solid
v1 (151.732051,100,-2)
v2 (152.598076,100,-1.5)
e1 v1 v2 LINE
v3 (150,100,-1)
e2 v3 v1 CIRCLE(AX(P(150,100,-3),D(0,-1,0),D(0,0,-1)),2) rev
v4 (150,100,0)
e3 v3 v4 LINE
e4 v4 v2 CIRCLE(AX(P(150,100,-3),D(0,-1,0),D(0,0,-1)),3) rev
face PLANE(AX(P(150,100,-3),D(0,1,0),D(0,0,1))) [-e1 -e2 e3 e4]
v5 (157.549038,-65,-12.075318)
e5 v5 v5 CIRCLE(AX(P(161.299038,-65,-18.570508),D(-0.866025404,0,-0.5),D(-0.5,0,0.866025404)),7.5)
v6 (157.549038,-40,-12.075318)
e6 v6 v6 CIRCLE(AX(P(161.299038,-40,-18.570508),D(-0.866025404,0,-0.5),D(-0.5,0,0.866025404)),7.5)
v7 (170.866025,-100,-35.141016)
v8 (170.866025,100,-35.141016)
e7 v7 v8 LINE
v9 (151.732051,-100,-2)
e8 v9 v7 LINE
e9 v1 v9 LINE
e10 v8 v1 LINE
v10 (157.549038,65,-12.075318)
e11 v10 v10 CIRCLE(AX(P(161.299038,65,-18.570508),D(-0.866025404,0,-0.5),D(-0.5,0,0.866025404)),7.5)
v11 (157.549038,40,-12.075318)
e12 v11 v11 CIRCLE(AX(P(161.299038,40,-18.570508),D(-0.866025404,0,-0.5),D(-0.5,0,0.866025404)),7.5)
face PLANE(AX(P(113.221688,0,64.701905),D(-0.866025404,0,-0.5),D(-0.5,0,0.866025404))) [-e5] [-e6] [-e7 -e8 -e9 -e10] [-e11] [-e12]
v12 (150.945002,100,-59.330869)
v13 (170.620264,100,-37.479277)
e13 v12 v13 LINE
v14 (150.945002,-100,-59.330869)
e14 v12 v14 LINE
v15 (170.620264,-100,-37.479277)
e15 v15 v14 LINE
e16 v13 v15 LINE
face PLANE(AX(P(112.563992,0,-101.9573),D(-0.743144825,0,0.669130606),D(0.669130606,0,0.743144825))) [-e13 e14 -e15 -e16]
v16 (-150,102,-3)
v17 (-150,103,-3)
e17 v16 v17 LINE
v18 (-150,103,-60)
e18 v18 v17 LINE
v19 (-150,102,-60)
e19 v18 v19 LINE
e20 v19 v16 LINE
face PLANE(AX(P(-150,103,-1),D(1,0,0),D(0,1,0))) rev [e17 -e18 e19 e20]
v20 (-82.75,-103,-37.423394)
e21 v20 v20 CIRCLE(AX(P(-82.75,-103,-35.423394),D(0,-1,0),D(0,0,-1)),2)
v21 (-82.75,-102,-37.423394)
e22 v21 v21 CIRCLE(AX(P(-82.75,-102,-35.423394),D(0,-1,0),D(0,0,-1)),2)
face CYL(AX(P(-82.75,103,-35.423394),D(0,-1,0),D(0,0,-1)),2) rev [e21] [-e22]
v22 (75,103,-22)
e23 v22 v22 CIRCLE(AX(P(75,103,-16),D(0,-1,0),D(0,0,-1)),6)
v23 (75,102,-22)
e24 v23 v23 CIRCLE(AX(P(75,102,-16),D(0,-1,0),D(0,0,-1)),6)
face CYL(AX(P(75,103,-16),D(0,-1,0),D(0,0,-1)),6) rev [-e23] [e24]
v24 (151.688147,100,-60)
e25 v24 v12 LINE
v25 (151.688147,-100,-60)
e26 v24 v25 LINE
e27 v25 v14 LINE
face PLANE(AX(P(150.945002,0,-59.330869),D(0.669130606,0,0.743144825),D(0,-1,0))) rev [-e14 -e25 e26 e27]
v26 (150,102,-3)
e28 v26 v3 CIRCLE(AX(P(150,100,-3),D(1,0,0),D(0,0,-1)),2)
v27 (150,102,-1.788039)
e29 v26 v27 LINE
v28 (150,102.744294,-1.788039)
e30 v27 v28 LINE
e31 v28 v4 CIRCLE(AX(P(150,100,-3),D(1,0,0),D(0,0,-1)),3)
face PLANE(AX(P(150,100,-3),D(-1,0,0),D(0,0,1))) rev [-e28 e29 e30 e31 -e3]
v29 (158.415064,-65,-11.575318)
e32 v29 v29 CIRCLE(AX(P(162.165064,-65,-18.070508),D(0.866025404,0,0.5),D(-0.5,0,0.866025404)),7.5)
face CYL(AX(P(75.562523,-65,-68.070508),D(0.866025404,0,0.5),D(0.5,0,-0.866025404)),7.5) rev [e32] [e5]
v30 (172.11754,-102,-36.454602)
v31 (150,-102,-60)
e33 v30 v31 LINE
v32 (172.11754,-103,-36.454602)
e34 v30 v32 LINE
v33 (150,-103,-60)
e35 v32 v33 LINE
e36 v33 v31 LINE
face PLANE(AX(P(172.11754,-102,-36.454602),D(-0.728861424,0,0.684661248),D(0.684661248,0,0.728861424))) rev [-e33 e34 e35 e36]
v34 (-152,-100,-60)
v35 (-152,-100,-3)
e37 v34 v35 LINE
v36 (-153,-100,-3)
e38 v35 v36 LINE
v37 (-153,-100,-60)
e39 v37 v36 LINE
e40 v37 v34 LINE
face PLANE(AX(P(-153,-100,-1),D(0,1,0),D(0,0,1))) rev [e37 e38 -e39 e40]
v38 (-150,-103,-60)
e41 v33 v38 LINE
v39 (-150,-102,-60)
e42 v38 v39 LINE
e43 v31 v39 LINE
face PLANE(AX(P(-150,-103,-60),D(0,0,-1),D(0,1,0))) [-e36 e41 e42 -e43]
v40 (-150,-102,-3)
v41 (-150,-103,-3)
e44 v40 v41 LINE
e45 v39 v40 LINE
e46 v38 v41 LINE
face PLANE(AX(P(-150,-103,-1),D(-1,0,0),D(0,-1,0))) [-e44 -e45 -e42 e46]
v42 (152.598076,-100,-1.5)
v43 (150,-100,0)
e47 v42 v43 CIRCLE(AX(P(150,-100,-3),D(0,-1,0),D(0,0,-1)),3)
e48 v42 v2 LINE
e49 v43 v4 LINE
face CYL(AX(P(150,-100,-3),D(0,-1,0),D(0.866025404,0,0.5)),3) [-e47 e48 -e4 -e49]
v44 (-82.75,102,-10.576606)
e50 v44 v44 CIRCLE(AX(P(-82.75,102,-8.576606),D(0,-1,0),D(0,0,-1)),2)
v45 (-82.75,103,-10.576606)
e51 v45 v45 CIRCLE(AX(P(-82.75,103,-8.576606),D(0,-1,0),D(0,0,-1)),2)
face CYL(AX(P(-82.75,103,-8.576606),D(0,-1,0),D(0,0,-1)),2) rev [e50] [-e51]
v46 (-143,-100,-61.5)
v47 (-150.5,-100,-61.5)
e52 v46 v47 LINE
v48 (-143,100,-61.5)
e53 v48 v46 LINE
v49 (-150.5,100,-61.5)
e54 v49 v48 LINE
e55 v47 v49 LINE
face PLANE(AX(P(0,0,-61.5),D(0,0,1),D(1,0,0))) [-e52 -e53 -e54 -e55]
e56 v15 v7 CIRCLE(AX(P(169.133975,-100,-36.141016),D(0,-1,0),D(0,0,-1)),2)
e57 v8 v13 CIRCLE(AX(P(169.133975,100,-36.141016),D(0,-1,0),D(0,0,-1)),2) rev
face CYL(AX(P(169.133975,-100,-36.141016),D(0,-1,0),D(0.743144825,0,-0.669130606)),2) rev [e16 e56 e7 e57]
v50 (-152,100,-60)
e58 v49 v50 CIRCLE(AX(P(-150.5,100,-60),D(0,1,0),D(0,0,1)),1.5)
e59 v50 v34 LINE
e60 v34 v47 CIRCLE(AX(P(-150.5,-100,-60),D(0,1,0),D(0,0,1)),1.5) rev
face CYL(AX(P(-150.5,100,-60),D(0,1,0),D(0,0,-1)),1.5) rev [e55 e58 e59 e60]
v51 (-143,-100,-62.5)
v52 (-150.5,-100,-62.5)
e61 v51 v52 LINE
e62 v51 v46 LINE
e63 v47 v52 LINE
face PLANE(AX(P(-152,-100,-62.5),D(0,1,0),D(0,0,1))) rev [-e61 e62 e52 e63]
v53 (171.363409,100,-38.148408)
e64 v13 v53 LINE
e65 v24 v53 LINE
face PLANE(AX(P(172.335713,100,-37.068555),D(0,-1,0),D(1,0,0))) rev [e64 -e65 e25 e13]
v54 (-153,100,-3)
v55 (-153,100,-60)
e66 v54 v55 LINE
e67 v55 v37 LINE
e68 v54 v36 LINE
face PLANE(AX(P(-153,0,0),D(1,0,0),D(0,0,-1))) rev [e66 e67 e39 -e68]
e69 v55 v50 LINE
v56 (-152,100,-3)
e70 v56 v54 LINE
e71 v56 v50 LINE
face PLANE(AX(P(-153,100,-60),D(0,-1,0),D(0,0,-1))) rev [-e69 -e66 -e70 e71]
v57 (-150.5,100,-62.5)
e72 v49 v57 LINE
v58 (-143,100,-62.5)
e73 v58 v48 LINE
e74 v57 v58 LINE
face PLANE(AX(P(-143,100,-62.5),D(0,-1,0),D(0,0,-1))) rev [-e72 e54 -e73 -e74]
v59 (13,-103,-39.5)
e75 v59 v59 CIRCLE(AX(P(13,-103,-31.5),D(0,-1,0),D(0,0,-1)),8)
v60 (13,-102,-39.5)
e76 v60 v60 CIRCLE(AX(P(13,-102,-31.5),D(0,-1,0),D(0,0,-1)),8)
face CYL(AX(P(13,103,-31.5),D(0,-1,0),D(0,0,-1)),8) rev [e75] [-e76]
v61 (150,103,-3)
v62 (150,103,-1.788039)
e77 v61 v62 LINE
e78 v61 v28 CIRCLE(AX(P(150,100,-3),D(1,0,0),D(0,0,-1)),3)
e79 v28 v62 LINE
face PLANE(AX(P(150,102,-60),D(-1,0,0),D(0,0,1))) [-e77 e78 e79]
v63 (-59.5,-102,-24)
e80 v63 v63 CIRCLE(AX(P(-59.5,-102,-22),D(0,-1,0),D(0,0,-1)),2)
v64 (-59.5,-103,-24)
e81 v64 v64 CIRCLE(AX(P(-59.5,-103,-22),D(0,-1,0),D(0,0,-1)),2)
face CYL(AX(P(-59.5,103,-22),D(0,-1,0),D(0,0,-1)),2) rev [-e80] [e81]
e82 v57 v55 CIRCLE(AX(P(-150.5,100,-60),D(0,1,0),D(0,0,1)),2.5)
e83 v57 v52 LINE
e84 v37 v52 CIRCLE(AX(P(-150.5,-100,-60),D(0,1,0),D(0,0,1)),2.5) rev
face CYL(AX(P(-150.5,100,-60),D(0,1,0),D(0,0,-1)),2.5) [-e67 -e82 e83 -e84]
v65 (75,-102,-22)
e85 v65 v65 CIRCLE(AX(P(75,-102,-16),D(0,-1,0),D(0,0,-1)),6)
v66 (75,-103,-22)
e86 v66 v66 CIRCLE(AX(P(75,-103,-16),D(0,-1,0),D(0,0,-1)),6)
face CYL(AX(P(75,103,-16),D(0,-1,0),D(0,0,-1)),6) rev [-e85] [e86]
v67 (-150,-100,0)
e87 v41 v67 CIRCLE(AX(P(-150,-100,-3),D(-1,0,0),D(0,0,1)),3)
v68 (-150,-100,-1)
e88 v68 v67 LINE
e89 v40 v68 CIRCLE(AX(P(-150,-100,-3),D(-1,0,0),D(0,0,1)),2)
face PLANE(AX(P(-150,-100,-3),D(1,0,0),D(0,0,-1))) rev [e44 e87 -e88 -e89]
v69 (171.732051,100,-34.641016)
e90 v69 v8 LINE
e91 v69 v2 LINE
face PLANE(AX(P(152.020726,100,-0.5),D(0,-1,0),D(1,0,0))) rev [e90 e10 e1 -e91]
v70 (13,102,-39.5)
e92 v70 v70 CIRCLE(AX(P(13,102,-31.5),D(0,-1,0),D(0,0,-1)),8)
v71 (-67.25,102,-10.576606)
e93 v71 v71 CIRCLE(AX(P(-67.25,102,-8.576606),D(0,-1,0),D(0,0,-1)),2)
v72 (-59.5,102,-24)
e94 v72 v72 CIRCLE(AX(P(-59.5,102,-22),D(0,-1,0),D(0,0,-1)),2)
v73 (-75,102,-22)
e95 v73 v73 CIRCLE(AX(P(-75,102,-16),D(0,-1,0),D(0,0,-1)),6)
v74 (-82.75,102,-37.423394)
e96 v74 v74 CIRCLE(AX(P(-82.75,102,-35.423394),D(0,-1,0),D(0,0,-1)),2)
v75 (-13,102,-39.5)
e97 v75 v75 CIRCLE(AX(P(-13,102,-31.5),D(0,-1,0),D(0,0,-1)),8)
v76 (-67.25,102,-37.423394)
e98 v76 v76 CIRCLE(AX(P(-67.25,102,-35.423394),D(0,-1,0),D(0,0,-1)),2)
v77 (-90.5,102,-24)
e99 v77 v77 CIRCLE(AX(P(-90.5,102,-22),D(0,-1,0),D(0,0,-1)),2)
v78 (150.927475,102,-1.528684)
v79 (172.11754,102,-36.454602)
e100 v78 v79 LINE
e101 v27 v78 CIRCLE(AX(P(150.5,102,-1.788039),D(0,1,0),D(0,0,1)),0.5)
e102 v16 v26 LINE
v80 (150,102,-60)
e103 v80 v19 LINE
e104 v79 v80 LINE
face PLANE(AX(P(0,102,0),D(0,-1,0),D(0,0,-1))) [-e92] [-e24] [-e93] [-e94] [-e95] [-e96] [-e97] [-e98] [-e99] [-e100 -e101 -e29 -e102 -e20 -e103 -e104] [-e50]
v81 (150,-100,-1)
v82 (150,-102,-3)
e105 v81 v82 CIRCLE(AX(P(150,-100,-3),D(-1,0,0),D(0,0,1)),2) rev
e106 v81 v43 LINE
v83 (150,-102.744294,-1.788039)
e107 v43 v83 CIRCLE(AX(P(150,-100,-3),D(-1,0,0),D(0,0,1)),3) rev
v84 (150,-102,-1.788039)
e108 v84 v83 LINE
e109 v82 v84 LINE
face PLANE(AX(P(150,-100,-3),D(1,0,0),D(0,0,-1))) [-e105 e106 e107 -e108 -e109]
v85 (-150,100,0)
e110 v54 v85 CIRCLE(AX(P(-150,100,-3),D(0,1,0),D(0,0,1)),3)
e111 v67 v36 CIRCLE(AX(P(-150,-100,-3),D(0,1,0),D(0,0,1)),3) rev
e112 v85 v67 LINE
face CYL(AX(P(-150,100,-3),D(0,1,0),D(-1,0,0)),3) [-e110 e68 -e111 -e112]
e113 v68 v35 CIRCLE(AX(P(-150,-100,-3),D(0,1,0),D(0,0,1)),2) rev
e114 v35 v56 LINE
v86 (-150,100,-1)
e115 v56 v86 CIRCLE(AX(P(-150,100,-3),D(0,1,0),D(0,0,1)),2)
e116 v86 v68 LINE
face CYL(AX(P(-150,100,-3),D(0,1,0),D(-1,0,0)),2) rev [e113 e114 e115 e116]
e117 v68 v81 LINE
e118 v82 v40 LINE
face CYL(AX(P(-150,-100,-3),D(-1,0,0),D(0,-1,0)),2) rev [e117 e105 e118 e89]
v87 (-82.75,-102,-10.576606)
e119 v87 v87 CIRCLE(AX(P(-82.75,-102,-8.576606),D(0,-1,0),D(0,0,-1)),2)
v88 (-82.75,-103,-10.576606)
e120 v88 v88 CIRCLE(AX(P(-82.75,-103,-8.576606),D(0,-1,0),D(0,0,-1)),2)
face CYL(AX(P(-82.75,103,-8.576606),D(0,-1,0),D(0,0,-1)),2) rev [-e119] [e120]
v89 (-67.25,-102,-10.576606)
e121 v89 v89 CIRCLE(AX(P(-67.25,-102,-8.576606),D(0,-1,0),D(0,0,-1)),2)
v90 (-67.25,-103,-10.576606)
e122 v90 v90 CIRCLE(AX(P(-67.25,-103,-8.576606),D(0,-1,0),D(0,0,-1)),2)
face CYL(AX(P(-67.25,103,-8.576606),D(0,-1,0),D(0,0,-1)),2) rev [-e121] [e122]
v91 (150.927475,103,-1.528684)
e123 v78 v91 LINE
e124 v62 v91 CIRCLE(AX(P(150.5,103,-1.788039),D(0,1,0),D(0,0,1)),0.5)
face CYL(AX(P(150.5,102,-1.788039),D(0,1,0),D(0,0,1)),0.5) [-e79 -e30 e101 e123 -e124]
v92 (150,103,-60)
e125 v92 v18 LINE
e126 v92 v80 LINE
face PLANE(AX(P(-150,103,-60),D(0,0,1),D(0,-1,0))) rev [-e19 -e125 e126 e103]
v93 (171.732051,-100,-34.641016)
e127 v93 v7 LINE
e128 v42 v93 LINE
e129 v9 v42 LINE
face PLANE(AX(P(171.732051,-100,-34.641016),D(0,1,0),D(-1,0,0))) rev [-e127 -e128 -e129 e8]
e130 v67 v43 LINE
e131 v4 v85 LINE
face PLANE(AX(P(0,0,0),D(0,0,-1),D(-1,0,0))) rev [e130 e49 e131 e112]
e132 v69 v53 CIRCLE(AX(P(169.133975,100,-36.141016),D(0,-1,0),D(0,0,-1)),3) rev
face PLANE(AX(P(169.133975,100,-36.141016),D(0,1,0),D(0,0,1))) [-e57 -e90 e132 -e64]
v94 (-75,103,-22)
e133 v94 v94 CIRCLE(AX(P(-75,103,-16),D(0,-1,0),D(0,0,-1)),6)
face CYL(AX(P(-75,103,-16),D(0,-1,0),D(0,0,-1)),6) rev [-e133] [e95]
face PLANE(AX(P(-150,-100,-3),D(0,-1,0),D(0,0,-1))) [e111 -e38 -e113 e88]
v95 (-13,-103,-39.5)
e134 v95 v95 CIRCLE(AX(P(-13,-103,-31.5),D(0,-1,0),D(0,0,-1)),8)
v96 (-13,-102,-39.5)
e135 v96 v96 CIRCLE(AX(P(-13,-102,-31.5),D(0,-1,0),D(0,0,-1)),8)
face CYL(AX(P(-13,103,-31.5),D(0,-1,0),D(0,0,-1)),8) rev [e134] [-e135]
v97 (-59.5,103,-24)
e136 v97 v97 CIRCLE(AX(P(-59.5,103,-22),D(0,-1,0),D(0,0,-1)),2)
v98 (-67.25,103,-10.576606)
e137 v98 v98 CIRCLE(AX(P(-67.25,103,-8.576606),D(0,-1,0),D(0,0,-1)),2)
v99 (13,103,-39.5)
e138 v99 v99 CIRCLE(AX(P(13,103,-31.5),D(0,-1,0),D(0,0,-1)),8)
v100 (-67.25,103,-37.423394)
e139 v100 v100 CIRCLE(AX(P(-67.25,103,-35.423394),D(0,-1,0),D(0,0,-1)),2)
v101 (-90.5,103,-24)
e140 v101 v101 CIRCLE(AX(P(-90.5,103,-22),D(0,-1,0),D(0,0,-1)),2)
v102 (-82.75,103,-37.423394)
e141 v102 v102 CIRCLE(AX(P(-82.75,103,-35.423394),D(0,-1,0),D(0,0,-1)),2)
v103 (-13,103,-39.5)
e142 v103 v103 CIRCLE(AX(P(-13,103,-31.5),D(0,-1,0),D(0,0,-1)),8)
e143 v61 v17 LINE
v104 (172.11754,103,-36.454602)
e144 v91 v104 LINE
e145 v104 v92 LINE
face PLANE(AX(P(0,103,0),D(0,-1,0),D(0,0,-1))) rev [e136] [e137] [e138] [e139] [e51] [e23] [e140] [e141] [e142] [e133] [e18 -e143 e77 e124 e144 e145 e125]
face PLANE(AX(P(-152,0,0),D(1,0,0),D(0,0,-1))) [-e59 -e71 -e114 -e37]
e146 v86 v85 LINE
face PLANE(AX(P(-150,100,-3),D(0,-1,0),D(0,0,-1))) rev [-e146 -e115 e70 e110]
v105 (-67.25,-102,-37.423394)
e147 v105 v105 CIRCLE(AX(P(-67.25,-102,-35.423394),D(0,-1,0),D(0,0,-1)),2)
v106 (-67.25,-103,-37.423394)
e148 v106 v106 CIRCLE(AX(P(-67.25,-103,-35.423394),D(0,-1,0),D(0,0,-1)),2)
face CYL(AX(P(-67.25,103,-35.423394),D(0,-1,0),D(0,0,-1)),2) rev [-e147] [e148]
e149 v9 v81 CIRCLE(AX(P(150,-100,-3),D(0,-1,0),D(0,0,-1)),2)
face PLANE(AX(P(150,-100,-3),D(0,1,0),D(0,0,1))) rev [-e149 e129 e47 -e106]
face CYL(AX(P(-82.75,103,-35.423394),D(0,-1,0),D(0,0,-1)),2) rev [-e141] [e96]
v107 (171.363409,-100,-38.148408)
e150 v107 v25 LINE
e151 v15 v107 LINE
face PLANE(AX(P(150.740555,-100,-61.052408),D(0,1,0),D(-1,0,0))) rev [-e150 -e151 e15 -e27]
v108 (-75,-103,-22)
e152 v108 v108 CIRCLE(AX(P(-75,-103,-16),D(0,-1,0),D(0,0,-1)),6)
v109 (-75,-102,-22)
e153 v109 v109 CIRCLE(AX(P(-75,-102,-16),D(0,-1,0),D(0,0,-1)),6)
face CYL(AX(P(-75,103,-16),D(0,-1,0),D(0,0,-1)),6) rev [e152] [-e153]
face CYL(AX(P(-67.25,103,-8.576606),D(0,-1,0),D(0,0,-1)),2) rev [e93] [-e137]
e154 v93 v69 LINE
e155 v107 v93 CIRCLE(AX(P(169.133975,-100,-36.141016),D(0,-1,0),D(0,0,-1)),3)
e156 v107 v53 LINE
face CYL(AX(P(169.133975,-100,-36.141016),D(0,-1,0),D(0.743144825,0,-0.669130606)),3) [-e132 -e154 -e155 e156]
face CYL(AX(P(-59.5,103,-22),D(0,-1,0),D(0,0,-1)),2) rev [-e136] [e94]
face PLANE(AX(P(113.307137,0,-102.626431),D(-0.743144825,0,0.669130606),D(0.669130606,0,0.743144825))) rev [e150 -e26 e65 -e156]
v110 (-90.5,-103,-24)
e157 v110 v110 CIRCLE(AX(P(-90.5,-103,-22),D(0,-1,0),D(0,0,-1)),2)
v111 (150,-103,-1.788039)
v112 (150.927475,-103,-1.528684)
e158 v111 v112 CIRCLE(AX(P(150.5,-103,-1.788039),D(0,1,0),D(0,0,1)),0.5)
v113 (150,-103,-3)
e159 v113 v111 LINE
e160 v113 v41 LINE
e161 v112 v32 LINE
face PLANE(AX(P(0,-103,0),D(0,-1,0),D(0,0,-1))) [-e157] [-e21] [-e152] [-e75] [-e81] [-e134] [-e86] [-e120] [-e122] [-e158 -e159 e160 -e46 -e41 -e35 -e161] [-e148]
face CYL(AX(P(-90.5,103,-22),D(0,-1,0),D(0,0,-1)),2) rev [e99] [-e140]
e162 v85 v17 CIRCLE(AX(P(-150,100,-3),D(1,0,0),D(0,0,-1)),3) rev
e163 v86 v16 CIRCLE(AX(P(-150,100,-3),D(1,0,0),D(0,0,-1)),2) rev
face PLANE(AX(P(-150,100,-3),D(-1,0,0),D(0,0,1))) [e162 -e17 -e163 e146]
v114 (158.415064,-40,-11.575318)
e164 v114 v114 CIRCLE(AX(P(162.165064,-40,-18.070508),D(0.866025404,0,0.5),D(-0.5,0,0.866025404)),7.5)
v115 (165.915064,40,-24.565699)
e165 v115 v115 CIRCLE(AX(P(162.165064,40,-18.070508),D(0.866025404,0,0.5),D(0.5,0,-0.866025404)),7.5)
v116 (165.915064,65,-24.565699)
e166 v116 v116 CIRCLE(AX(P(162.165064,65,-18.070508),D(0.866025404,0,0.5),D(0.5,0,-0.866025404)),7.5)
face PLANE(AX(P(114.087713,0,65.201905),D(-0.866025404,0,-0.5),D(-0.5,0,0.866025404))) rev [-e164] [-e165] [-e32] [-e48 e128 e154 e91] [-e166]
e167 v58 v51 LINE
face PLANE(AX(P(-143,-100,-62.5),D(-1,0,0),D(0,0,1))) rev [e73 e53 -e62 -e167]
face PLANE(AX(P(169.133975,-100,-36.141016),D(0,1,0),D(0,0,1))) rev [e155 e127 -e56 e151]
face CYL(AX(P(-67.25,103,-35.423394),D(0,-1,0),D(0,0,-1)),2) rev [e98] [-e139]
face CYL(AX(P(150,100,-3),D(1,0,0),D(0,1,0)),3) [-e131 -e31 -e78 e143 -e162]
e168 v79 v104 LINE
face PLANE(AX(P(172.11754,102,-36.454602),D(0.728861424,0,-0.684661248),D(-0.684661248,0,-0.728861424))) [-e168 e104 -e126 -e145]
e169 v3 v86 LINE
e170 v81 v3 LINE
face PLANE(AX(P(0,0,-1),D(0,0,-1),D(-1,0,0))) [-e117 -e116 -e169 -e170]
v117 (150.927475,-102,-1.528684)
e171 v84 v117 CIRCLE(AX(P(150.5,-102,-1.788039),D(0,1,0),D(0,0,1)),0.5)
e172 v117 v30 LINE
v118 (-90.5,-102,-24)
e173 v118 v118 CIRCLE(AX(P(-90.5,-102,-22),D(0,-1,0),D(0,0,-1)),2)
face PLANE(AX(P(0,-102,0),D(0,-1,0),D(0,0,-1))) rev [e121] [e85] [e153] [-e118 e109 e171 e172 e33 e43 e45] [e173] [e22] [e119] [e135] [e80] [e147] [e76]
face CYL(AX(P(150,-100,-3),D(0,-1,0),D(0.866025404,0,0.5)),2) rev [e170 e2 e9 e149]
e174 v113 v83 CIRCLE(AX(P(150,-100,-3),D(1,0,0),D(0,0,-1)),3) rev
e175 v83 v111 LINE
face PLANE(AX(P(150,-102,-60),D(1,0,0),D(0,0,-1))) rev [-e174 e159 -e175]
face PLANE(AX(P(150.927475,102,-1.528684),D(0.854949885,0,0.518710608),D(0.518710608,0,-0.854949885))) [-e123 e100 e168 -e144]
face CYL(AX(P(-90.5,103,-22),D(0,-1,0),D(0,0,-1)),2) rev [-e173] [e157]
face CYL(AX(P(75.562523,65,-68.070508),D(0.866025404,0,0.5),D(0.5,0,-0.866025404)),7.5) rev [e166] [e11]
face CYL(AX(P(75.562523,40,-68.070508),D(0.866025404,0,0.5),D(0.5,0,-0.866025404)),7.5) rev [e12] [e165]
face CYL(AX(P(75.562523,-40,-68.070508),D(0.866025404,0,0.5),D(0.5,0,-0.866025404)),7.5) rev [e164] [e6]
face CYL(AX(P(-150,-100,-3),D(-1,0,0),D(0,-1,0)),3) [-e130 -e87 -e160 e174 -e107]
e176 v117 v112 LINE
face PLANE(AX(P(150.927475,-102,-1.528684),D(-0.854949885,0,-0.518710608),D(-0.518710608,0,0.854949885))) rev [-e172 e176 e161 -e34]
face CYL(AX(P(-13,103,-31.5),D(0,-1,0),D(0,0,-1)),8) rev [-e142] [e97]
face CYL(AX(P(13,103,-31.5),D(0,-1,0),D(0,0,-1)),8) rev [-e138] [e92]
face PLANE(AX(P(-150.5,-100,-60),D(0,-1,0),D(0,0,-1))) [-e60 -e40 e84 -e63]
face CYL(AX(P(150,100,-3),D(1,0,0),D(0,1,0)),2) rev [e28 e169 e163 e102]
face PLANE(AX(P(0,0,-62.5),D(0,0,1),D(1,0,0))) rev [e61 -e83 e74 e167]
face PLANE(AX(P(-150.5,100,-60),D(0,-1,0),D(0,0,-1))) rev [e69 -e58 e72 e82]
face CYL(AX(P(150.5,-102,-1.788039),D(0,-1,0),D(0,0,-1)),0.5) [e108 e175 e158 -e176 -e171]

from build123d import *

# Parameters (mm, degrees)
SKETCH1_W           = 300
SKETCH1_H           = 200
BASE_FLANGE1_DEPTH  = 1
EDGE_FLANGE1_DEPTH  = 200
EDGE_FLANGE2_DEPTH  = 300
EDGE_FLANGE3_DEPTH  = 300
EDGE_FLANGE4_DEPTH  = 200
EDGE_FLANGE5_DEPTH  = 200
BOSS_EXTRUDE2_DEPTH = 1
CUT_EXTRUDE4_START  = -100
CUT_EXTRUDE4_DEPTH  = 200
SKETCH26_R          = 7.5
CUT_EXTRUDE5_DEPTH  = 100
EDGE_FLANGE7_DEPTH  = 200
SKETCH38_R          = 6
CUT_EXTRUDE6_DEPTH  = 276.630831386
SKETCH40_R          = 2
CUT_EXTRUDE7_DEPTH  = 276.630831386
SKETCH41_R          = 8
CUT_EXTRUDE8_DEPTH  = 276.630831386


# Read off the part's stored shape, not the designer's step: Cut-Extrude4
# Sheet-metal steps are written as plain solids
with BuildPart() as part:
    # Sketch1 → Base-Flange1 (new body)
    with BuildSketch(Plane.XY):
        Rectangle(SKETCH1_W, SKETCH1_H)
    extrude(amount=-BASE_FLANGE1_DEPTH)

    # Edge-Flange1 section (across the edge) → Edge-Flange1 (add)
    with BuildSketch(Plane(origin=(-152, -100, -1), x_dir=(1, 0, 0), z_dir=(0, 1, 0))):
        with BuildLine():
            Line((-1, 2), (-1, 59))
            Line((-1, 59), (0, 59))
            Line((0, 59), (0, 2))
            ThreePointArc((0, 2), (0.585786438, 0.585786438), (2, 0))
            Line((2, 0), (2, -1))
            ThreePointArc((2, -1), (-0.121320344, -0.121320344), (-1, 2))
        make_face()
    extrude(amount=EDGE_FLANGE1_DEPTH)

    # Edge-Flange2 section (across the edge) → Edge-Flange2 (add)
    with BuildSketch(Plane(origin=(150, -102, -1), x_dir=(0, 1, 0), z_dir=(-1, 0, 0))):
        with BuildLine():
            Line((-1, 2), (-1, 59))
            Line((-1, 59), (0, 59))
            Line((0, 59), (0, 2))
            ThreePointArc((0, 2), (0.585786438, 0.585786438), (2, 0))
            Line((2, 0), (2, -1))
            ThreePointArc((2, -1), (-0.121320344, -0.121320344), (-1, 2))
        make_face()
    extrude(amount=EDGE_FLANGE2_DEPTH)

    # Edge-Flange3 section (across the edge) → Edge-Flange3 (add)
    with BuildSketch(Plane(origin=(-150, 102, -1), x_dir=(0, -1, 0), z_dir=(1, 0, 0))):
        with BuildLine():
            Line((-1, 2), (-1, 59))
            Line((-1, 59), (0, 59))
            Line((0, 59), (0, 2))
            ThreePointArc((0, 2), (0.585786438, 0.585786438), (2, 0))
            Line((2, 0), (2, -1))
            ThreePointArc((2, -1), (-0.121320344, -0.121320344), (-1, 2))
        make_face()
    extrude(amount=EDGE_FLANGE3_DEPTH)

    # Edge-Flange4 section (across the edge) → Edge-Flange4 (add)
    with BuildSketch(Plane(origin=(151.154700538, 100, -1), x_dir=(-0.8660254037844364, 0, -0.5000000000000041), z_dir=(0, -1, 0))):
        with BuildLine():
            Line((-1, 1.154700538), (-1, 39.422649731))
            Line((-1, 39.422649731), (0, 39.422649731))
            Line((0, 39.422649731), (0, 1.154700538))
            ThreePointArc((0, 1.154700538), (0.267949192, 0.154700538), (1, -0.577350269))
            Line((1, -0.577350269), (0.5, -1.443375673))
            ThreePointArc((0.5, -1.443375673), (-0.598076211, -0.345299462), (-1, 1.154700538))
        make_face()
    extrude(amount=EDGE_FLANGE4_DEPTH)

    # Edge-Flange5 section (across the edge) → Edge-Flange5 (add)
    with BuildSketch(Plane(origin=(171.592567932, 100, -36.399424724), x_dir=(-0.7431448254774, 0, 0.6691306063588518), z_dir=(0, -1, 0))):
        with BuildLine():
            Line((-1, 1.453085056), (-1, 32.273457472))
            Line((-1, 32.273457472), (0, 32.273457472))
            Line((0, 32.273457472), (0, 1.453085056))
            ThreePointArc((0, 1.453085056), (0.381966011, 0.277514551), (1.381966011, -0.449027977))
            Line((1.381966011, -0.449027977), (1.072949017, -1.400084493))
            ThreePointArc((1.072949017, -1.400084493), (-0.427050983, -0.310270701), (-1, 1.453085056))
        make_face()
    extrude(amount=EDGE_FLANGE5_DEPTH)

    # Sketch22 → Boss-Extrude2 (add)
    with BuildSketch(Plane(origin=(0, 103, 0), x_dir=(1, 0, 0), z_dir=(0, 1, 0))):
        with BuildLine():
            Line((150, 60), (150, 1.788039282))
            ThreePointArc((150, 1.788039282), (150.365347616, 1.306511779), (150.927474942, 1.528683978))
            Line((150.927474942, 1.528683978), (172.117540282, 36.454601541))
            Line((172.117540282, 36.454601541), (150, 60))
        make_face()
    boss_extrude2 = extrude(amount=-BOSS_EXTRUDE2_DEPTH)

    # Mirror2: Boss-Extrude2 across plane
    add(boss_extrude2.mirror(Plane.ZX))

    # Cut-Extrude4 outline → Cut-Extrude4 (cut)
    with BuildSketch(Plane(origin=(0, 0, 0), x_dir=(1, 0, 0), z_dir=(0, 1, 0)).offset(CUT_EXTRUDE4_START)):
        Polygon((149.997409764, 60.383277644), (150.945002409, 59.330869394), (151.688147235, 60), (150.74055459, 61.052408251), align=None)
    extrude(amount=CUT_EXTRUDE4_DEPTH, mode=Mode.SUBTRACT)

    # Sketch26 → Cut-Extrude5 (cut)
    with BuildSketch(Plane(origin=(113.799038106, 0, 65.701905284), x_dir=(0.500000000000004, 0, -0.8660254037844364), z_dir=(0.8660254037844364, 0, 0.500000000000004))):
        with Locations((96.732050808, 65)):
            Circle(SKETCH26_R)
        with Locations((96.732050808, 40)):
            Circle(SKETCH26_R)
        with Locations(Location((96.732050808, -40, 0), (0, 0, 180))):
            Circle(SKETCH26_R)
        with Locations(Location((96.732050808, -65, 0), (0, 0, 180))):
            Circle(SKETCH26_R)
    extrude(amount=-CUT_EXTRUDE5_DEPTH, mode=Mode.SUBTRACT)

    # Edge-Flange7 section (across the edge) → Edge-Flange7 (add)
    with BuildSketch(Plane(origin=(-152, -100, -61.5), x_dir=(0, 0, 1), z_dir=(0, 1, 0))):
        with BuildLine():
            Line((-1, 1.5), (-1, 9))
            Line((-1, 9), (0, 9))
            Line((0, 9), (0, 1.5))
            ThreePointArc((0, 1.5), (0.439339828, 0.439339828), (1.5, 0))
            Line((1.5, 0), (1.5, -1))
            ThreePointArc((1.5, -1), (-0.267766953, -0.267766953), (-1, 1.5))
        make_face()
    extrude(amount=EDGE_FLANGE7_DEPTH)

    # Sketch38 → Cut-Extrude6 (cut, through all)
    with BuildSketch(Plane.XZ.offset(103)):
        with Locations(Location((-75, -16, 0), (0, 0, 270))):
            Circle(SKETCH38_R)
        with Locations(Location((75, -16, 0), (0, 0, 270))):
            Circle(SKETCH38_R)
    extrude(amount=-CUT_EXTRUDE6_DEPTH, mode=Mode.SUBTRACT)

    # Sketch40 → Cut-Extrude7 (cut, through all)
    with BuildSketch(Plane.XZ.offset(103)):
        with Locations(Location((-90.5, -22, 0), (0, 0, 270))):
            Circle(SKETCH40_R)
        with Locations(Location((-82.75, -8.576606241, 0), (0, 0, 270))):
            Circle(SKETCH40_R)
        with Locations(Location((-67.25, -8.576606241, 0), (0, 0, 270))):
            Circle(SKETCH40_R)
        with Locations(Location((-59.5, -22, 0), (0, 0, 270))):
            Circle(SKETCH40_R)
        with Locations(Location((-67.25, -35.423393759, 0), (0, 0, 270))):
            Circle(SKETCH40_R)
        with Locations(Location((-82.75, -35.423393759, 0), (0, 0, 270))):
            Circle(SKETCH40_R)
    extrude(amount=-CUT_EXTRUDE7_DEPTH, mode=Mode.SUBTRACT)

    # Sketch41 → Cut-Extrude8 (cut, through all)
    with BuildSketch(Plane.XZ.offset(103)):
        with Locations(Location((-13, -31.5, 0), (0, 0, 270))):
            Circle(SKETCH41_R)
        with Locations(Location((13, -31.5, 0), (0, 0, 270))):
            Circle(SKETCH41_R)
    extrude(amount=-CUT_EXTRUDE8_DEPTH, mode=Mode.SUBTRACT)


solid = part.part
